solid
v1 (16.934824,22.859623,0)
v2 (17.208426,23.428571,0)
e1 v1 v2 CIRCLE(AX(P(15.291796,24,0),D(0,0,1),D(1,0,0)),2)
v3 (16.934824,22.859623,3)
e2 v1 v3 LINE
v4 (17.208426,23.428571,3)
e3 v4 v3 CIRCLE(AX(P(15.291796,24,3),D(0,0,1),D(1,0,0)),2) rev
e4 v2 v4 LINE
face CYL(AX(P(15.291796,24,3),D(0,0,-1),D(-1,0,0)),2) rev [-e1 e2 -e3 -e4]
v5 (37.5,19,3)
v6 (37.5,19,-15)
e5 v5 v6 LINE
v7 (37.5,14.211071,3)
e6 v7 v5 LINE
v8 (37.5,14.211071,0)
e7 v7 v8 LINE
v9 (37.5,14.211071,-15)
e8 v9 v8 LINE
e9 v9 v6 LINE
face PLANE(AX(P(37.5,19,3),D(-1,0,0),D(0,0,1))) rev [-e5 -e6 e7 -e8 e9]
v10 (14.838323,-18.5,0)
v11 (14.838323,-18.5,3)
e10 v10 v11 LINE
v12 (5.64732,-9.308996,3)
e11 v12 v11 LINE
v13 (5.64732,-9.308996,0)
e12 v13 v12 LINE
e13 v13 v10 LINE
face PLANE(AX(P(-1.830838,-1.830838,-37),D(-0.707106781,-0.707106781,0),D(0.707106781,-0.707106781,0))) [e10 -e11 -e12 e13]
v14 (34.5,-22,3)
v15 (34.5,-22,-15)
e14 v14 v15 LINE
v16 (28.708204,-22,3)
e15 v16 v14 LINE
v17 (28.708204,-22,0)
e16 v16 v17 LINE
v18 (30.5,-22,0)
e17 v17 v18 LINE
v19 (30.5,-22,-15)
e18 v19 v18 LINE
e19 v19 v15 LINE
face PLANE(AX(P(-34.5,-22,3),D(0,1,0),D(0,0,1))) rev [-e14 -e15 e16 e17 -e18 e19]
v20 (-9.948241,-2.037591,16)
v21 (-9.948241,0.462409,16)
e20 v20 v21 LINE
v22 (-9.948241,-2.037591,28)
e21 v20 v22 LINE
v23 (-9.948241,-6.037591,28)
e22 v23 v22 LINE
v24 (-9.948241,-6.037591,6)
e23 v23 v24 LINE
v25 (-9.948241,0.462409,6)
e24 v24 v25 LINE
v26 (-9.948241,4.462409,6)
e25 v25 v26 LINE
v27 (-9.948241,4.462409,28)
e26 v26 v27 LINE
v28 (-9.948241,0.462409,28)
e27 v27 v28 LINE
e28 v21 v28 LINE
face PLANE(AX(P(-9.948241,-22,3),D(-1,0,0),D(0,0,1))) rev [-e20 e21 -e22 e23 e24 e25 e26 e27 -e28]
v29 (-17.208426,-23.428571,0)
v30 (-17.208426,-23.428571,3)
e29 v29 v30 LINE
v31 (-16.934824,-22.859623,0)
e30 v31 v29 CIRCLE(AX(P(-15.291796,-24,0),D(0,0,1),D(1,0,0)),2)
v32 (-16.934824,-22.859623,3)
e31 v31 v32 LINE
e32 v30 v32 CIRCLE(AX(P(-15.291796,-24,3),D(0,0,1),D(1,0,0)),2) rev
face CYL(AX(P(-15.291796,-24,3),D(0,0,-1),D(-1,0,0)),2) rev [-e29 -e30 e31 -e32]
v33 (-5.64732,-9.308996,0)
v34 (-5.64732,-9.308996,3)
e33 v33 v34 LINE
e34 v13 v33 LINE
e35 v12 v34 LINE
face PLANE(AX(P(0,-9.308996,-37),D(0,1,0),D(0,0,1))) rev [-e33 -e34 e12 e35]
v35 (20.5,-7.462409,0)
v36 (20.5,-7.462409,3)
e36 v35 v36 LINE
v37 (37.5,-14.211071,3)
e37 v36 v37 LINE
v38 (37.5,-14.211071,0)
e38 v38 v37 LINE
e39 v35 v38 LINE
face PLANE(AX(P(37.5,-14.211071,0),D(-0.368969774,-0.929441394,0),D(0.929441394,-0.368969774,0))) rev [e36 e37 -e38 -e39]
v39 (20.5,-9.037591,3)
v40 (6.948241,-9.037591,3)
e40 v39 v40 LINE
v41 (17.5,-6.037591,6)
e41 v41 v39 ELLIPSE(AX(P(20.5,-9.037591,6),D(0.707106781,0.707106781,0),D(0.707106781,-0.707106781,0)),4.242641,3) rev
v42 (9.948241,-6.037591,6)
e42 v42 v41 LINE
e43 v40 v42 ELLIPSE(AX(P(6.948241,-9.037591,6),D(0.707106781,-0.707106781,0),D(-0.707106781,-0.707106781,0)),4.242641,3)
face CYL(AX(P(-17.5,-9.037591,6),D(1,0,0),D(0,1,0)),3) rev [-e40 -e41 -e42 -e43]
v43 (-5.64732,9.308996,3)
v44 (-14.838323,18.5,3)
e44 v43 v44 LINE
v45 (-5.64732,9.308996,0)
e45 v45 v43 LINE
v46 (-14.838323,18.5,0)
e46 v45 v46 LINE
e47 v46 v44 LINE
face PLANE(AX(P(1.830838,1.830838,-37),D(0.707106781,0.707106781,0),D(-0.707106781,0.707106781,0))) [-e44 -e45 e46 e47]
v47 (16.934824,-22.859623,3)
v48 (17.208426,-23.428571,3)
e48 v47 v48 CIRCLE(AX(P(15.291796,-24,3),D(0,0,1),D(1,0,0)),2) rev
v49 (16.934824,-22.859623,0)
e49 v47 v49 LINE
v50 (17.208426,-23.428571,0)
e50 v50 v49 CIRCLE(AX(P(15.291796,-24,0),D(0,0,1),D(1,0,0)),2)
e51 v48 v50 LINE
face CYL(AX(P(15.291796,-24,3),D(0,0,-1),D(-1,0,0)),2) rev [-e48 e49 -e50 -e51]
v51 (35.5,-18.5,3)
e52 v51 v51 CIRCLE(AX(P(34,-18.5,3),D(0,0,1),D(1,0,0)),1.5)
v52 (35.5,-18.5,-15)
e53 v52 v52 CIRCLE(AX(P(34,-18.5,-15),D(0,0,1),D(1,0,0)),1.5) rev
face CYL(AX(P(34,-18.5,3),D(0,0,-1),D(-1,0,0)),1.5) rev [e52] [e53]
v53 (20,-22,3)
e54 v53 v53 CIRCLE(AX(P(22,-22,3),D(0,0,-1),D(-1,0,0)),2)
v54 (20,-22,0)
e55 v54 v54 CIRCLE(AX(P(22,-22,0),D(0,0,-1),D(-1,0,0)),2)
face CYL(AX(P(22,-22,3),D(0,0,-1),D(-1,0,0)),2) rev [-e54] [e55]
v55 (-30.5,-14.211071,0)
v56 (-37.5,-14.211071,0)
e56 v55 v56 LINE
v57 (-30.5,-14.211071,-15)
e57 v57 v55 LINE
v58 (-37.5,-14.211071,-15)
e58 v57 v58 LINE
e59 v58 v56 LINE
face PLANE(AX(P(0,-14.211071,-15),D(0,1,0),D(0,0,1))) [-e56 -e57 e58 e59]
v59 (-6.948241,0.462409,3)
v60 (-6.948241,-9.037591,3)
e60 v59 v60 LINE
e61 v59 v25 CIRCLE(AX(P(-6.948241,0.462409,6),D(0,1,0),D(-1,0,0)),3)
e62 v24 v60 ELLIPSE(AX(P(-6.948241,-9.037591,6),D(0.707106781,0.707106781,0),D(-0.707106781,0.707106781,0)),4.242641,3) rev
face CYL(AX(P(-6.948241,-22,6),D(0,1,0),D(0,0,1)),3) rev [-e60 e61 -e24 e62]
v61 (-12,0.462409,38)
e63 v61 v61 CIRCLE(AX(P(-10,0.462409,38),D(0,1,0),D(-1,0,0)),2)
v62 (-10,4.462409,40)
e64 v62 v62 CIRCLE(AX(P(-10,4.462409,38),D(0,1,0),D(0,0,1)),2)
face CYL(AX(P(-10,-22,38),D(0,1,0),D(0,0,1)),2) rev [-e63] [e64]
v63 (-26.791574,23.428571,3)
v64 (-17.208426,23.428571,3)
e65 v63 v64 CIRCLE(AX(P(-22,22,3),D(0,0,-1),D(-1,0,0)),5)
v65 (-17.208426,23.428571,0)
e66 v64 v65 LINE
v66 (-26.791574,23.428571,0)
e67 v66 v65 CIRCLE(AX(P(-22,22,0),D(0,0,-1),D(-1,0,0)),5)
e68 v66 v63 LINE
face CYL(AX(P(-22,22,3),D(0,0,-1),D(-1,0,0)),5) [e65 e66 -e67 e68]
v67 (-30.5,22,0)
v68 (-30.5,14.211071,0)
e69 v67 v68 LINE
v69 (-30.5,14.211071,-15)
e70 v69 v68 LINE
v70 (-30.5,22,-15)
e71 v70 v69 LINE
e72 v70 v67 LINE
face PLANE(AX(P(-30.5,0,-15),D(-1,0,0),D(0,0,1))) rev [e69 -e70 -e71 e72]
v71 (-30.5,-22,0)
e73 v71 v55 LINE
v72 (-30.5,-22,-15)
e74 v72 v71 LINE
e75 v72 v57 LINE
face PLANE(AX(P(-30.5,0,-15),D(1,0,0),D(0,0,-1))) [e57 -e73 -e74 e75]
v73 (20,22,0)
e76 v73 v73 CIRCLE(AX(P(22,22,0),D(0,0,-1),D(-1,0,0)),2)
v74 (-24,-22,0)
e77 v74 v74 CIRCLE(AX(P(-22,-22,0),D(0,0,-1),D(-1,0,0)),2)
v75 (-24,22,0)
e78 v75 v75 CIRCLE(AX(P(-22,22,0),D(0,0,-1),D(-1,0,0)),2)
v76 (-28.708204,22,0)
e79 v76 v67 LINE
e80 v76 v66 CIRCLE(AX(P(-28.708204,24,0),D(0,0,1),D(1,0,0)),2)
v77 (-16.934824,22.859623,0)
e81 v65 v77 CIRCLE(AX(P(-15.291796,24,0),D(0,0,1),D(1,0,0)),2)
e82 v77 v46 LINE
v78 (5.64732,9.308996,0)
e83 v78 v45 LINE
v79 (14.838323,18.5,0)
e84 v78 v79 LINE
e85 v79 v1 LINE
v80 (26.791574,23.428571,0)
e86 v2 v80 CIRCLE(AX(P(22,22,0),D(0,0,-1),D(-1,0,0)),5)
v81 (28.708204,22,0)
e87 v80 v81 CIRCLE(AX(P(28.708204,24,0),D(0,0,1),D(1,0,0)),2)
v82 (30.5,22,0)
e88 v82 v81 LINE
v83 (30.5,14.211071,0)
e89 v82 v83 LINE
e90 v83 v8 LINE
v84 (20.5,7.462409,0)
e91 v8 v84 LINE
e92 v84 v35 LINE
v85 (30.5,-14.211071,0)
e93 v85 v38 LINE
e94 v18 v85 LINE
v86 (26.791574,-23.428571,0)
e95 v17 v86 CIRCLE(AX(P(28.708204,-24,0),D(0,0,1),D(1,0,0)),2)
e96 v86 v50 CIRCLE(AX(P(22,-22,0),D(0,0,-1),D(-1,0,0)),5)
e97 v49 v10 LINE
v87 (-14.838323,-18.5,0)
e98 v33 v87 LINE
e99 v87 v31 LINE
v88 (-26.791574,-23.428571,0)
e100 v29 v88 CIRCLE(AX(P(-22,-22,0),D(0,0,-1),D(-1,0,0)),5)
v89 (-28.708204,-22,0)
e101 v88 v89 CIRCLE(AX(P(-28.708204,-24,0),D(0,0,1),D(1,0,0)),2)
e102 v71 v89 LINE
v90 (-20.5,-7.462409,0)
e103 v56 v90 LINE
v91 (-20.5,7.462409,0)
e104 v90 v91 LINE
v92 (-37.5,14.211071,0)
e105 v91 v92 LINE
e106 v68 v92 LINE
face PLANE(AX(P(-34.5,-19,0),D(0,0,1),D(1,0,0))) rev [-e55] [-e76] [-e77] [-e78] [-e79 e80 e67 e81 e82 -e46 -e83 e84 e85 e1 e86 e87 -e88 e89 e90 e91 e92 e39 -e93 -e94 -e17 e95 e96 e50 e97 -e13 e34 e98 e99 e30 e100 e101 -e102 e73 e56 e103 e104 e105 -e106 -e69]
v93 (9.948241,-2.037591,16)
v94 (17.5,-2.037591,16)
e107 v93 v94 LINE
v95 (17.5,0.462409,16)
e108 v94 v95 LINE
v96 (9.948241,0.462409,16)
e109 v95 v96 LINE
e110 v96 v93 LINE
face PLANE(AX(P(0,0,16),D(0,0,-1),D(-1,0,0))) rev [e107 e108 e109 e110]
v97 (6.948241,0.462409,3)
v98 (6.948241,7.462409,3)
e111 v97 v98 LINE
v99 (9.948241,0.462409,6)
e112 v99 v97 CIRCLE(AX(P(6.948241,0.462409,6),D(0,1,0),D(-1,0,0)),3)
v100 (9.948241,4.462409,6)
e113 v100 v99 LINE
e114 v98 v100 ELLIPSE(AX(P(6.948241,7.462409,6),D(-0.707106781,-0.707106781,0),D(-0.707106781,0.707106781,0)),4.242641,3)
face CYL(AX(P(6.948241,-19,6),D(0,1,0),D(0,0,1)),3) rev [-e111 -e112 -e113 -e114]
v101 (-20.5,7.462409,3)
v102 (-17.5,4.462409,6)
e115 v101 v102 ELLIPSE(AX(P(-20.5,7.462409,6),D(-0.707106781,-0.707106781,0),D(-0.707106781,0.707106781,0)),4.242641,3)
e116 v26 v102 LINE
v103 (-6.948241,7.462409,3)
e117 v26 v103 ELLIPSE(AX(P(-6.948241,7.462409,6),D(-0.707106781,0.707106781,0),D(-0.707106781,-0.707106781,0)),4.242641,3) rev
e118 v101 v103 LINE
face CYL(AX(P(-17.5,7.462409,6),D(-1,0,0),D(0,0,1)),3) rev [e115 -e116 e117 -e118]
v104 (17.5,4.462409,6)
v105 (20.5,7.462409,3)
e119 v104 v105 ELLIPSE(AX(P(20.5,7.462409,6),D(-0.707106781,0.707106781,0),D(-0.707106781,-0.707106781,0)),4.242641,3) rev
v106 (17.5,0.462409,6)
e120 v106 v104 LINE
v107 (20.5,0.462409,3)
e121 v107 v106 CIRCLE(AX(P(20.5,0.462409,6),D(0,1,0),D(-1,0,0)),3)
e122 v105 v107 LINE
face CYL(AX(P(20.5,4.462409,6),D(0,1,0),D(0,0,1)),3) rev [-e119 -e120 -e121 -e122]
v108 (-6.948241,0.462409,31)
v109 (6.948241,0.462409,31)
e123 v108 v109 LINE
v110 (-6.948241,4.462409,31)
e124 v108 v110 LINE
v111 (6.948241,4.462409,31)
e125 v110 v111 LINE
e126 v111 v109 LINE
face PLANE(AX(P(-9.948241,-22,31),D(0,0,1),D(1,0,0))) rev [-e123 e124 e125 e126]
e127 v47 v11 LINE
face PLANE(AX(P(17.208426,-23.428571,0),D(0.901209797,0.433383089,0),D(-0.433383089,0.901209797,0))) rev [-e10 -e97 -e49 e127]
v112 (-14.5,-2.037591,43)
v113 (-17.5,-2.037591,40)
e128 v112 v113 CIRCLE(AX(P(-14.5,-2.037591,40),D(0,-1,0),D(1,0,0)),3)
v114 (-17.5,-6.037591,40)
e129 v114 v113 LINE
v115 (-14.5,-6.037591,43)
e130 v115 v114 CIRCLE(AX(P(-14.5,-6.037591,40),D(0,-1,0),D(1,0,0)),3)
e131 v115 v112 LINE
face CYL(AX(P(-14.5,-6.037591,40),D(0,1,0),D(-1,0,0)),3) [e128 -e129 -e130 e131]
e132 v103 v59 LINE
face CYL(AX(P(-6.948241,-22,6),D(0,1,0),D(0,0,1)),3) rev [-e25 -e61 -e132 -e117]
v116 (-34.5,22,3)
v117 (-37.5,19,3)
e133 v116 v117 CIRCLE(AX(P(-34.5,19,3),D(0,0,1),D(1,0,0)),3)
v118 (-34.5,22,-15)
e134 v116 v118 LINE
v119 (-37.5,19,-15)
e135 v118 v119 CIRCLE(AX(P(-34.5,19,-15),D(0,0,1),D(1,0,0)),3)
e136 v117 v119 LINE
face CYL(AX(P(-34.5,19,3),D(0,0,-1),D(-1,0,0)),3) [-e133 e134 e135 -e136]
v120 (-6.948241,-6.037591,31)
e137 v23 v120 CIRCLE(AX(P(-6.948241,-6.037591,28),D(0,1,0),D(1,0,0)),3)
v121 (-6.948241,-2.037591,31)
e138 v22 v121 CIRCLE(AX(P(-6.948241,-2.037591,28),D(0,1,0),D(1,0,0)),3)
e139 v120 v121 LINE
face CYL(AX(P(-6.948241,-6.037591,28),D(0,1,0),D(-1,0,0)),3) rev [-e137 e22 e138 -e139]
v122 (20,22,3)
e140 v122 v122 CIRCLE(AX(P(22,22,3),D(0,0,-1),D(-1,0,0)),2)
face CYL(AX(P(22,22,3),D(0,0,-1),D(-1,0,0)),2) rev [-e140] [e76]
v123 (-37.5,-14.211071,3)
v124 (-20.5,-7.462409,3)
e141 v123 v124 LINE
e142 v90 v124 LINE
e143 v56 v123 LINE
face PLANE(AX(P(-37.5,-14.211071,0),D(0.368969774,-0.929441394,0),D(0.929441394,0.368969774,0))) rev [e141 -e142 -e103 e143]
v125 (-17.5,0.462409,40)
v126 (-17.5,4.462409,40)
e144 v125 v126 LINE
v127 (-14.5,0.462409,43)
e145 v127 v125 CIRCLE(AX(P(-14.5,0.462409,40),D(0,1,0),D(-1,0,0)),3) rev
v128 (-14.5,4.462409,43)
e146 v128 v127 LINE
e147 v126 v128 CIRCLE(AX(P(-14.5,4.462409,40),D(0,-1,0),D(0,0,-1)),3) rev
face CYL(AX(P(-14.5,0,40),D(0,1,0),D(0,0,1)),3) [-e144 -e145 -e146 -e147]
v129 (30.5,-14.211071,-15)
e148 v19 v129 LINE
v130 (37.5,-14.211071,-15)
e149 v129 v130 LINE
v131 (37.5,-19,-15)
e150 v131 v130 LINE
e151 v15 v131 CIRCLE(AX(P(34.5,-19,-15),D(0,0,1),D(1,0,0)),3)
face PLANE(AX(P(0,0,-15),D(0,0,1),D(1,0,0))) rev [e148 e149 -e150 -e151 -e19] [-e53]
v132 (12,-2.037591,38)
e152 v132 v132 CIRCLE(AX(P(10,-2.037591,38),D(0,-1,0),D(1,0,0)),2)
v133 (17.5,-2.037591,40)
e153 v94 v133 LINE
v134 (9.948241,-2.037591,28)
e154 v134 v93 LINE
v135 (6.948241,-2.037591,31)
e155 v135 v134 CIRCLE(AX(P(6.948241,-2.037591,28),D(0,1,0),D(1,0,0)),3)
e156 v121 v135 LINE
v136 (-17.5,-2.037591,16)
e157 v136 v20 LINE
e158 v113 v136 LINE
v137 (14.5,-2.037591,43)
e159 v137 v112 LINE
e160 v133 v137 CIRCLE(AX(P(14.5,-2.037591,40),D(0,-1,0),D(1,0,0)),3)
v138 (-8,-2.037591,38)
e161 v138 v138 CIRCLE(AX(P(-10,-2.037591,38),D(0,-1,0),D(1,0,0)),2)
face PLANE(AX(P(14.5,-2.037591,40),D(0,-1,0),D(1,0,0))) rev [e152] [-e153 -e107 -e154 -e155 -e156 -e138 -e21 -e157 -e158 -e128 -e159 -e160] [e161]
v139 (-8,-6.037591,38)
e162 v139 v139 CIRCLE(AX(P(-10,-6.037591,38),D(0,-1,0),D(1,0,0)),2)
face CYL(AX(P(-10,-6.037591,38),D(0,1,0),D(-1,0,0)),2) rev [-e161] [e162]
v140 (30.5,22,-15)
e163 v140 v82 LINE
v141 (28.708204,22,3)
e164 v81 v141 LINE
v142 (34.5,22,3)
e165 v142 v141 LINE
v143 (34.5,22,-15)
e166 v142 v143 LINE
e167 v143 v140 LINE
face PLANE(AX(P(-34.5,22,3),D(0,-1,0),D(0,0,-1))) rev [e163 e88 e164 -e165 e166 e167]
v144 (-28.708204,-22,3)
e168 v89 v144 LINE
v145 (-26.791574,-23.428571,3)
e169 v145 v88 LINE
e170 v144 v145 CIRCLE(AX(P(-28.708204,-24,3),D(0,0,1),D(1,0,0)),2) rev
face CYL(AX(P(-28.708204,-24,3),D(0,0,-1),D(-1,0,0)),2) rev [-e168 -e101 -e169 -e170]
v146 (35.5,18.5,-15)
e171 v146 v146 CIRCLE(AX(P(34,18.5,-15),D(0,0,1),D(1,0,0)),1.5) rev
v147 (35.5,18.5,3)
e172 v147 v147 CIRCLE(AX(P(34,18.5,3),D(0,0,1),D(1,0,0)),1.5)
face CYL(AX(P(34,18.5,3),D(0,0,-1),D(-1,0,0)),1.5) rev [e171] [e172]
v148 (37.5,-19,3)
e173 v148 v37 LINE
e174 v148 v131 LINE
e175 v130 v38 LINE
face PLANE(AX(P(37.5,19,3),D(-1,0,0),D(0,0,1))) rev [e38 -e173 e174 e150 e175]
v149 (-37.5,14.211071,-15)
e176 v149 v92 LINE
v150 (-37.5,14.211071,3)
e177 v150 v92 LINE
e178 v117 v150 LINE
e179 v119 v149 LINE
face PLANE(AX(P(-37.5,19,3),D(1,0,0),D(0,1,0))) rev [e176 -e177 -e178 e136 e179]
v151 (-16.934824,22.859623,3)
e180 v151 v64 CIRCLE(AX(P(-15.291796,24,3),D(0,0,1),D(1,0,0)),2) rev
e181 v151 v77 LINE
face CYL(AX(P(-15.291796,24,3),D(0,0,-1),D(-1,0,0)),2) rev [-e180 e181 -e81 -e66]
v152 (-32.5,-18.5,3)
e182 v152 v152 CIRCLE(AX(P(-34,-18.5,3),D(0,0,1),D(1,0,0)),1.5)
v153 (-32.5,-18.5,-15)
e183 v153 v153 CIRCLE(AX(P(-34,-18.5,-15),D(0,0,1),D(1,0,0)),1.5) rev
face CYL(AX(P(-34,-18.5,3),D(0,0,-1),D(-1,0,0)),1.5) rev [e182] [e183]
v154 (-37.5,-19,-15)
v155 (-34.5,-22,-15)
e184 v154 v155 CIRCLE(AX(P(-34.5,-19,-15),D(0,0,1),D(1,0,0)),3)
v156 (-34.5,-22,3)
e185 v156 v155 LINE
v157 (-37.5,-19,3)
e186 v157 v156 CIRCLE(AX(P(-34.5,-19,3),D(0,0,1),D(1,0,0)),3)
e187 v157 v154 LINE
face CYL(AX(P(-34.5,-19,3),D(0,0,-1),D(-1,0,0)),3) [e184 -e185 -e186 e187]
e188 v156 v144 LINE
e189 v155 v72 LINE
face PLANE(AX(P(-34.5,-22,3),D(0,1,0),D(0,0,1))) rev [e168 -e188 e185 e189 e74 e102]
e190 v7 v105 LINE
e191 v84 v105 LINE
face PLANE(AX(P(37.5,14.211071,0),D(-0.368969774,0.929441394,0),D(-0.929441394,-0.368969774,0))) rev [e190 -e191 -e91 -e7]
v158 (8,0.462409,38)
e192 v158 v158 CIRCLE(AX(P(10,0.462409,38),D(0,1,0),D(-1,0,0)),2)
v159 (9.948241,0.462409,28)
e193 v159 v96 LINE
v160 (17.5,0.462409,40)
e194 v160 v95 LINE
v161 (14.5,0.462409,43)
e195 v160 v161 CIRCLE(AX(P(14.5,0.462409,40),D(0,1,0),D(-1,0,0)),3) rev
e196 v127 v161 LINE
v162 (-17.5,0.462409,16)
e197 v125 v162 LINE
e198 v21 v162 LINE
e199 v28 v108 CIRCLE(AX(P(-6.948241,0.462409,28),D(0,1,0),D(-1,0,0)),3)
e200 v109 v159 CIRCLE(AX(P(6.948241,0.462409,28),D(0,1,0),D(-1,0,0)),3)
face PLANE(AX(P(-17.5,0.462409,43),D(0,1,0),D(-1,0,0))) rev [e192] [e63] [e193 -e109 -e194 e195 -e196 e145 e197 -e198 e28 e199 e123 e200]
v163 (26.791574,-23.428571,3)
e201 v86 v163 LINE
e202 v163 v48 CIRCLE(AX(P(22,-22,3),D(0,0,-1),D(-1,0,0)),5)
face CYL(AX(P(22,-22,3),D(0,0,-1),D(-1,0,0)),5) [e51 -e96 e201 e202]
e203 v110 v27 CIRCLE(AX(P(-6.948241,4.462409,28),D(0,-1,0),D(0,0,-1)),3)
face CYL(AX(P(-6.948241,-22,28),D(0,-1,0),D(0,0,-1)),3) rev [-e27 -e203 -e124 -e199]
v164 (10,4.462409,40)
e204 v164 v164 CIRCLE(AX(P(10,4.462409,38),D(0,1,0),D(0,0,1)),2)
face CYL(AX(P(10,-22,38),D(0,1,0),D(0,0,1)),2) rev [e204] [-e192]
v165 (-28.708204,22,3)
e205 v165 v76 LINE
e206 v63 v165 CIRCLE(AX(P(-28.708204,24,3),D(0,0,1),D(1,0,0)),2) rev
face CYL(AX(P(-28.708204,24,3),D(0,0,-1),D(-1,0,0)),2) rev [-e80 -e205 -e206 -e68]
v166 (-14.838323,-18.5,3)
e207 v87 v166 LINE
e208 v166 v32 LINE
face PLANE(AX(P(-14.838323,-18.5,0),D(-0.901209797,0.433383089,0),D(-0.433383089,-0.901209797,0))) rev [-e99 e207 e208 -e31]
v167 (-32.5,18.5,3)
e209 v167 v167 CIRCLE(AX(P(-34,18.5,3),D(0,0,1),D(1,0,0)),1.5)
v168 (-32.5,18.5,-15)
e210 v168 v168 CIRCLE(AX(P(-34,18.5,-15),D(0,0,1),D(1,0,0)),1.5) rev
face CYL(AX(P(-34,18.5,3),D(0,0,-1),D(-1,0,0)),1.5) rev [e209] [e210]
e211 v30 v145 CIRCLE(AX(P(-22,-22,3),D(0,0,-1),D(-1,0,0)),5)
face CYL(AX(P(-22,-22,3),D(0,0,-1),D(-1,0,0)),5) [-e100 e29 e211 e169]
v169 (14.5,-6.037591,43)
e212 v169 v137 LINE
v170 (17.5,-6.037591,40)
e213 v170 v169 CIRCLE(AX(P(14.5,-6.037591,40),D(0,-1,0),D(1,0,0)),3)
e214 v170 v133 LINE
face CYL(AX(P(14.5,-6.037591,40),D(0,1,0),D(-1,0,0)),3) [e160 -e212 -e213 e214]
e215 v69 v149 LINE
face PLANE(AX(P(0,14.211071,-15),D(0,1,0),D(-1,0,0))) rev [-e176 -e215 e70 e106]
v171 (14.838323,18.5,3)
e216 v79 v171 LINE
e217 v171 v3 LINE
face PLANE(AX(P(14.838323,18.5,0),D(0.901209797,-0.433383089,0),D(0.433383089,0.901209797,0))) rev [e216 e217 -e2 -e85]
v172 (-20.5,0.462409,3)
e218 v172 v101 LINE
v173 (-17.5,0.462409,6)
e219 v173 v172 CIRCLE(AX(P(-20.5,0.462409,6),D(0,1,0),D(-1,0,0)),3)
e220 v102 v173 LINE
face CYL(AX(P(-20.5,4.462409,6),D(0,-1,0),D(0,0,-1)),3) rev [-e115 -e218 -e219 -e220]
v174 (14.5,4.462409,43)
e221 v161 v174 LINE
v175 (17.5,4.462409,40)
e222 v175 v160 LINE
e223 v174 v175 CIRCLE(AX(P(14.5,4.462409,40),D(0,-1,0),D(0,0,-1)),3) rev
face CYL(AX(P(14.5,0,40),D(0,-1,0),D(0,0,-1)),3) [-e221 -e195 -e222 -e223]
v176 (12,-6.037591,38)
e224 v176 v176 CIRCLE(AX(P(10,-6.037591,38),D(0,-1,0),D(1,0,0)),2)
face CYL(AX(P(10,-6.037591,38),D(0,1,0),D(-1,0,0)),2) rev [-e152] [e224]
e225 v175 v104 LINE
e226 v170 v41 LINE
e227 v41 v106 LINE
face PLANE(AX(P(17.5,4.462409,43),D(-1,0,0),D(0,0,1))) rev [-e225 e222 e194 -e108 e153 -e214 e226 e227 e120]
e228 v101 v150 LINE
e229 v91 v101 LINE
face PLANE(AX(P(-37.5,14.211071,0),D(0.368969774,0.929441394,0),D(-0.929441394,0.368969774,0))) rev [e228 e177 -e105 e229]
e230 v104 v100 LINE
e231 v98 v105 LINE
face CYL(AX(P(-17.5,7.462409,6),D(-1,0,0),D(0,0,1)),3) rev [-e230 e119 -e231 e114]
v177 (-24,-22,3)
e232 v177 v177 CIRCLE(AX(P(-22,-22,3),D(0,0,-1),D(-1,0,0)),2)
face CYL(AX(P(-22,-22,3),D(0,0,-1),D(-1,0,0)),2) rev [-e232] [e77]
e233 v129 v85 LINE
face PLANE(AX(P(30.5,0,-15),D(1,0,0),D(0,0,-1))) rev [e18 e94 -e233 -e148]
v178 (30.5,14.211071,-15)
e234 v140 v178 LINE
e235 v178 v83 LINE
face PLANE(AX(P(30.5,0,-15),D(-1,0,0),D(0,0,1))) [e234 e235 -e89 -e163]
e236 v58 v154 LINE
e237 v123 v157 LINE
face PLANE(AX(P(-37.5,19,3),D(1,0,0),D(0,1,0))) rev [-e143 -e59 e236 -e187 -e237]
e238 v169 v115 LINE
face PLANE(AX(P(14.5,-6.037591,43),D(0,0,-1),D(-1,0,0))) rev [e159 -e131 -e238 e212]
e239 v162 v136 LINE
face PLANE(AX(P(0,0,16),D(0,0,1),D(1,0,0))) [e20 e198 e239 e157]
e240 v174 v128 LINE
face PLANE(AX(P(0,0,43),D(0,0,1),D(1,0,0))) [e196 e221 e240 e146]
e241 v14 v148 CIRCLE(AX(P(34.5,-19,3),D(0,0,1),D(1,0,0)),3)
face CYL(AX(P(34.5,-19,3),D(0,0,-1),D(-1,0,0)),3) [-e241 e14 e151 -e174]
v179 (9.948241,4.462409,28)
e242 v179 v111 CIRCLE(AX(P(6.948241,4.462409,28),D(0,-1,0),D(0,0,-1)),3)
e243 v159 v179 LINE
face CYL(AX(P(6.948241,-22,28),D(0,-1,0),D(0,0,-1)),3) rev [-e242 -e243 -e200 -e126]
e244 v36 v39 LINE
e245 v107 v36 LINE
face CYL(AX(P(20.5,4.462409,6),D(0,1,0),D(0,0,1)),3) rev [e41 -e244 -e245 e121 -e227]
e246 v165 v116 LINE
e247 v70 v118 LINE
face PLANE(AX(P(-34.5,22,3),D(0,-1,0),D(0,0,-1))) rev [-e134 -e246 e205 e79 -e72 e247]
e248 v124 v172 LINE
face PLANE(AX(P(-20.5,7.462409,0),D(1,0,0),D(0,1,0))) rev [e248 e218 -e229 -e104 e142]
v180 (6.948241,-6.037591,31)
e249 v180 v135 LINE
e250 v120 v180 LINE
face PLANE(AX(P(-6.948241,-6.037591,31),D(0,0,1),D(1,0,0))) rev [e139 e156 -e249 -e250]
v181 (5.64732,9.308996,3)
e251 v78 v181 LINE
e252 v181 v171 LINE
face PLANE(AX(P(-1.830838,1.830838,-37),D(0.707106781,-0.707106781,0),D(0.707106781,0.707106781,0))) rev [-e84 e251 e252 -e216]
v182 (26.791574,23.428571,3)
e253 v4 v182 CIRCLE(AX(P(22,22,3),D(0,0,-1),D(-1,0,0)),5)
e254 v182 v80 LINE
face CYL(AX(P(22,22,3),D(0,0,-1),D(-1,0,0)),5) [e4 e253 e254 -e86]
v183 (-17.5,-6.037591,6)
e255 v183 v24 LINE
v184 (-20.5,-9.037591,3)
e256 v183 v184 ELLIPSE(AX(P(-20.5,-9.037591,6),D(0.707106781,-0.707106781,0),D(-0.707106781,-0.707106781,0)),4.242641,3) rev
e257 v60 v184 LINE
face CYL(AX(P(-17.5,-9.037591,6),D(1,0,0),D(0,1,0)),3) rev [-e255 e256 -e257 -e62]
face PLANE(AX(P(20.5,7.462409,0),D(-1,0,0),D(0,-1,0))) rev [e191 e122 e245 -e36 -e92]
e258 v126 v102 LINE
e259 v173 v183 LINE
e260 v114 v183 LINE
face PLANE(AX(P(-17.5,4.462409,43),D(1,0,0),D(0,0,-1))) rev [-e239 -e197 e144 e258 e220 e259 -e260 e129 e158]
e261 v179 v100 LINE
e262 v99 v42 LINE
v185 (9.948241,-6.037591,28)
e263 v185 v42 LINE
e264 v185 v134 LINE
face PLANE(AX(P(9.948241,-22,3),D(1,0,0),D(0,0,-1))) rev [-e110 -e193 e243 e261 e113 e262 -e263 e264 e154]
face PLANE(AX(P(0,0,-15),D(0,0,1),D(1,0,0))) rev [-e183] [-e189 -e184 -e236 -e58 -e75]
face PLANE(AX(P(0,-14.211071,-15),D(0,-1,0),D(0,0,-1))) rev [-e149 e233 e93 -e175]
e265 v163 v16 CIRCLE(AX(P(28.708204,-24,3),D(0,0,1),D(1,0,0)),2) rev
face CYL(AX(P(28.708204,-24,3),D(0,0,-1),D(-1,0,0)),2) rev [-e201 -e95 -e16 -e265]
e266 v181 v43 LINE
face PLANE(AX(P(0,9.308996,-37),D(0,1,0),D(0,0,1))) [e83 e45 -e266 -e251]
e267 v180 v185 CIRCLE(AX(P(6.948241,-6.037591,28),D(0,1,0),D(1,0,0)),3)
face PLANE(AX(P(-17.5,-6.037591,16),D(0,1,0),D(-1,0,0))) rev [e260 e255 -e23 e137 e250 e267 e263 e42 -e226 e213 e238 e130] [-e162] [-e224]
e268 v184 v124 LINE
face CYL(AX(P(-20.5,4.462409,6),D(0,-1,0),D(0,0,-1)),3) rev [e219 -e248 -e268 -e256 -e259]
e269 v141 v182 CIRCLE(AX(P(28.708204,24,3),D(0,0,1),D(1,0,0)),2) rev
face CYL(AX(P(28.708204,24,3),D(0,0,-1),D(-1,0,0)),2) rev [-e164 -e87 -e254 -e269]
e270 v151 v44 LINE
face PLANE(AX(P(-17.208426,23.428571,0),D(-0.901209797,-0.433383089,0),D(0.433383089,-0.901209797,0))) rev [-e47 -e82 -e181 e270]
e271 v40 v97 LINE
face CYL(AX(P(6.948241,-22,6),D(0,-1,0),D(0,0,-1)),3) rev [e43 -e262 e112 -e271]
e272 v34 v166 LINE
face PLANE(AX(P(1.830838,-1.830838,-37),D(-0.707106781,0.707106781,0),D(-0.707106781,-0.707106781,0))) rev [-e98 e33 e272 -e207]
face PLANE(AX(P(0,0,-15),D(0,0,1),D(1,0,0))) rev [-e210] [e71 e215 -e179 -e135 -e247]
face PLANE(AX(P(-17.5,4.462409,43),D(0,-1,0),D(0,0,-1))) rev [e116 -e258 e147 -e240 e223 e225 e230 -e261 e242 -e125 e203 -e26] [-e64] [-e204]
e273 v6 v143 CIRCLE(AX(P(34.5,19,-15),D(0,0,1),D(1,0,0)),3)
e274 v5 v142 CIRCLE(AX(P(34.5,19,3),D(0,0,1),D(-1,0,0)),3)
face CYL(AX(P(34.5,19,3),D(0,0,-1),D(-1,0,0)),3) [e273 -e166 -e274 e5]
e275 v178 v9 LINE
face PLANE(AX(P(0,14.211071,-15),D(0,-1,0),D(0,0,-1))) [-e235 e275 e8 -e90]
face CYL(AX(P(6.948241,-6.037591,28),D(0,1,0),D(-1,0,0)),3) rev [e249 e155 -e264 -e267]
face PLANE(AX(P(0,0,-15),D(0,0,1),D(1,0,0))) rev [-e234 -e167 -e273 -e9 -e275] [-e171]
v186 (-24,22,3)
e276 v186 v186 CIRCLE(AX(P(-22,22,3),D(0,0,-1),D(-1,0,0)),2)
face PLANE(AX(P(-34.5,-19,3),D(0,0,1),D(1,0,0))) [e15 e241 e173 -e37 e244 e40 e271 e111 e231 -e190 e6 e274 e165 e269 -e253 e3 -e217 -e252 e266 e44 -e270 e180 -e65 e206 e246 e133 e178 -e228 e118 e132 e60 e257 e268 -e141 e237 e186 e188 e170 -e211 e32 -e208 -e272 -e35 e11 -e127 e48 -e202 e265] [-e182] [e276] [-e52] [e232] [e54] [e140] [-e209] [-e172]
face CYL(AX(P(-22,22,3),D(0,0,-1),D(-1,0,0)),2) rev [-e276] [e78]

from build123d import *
from build123d.topology import SkipClean

# Parameters (mm, degrees)
SKETCH_1_R           = 1.5
EXTRUDE_1_DEPTH      = 3
SKETCH_3_W           = 35
SKETCH_3_H           = 4
EXTRUDE_2_DEPTH      = 40
CUT_EXTRUDE_3_DEPTH  = 40
SKETCH_5_R           = 2
EXTRUDE_3_DEPTH      = 4
SKETCH_4_R           = 2
CUT_EXTRUDE_4_DEPTH  = 74.181343691
EXTRUDE_START        = 4
SKETCH_6_R           = 2
SKETCH_6_W           = 11.5
SKETCH_6_H           = 11
EXTRUDE_4_DEPTH      = 4
SKETCH_7_R           = 2
SKETCH_7_W           = 19.896481546
SKETCH_7_H           = 28
CUT_EXTRUDE_5_DEPTH  = 74.181343691
CUT_EXTRUDE_6_DEPTH  = 73.339863176
FILLET_2_R           = 3
FILLET_3_R           = 3
EXTRUDE_START_2      = -18
SKETCH_10_R          = 1.5
EXTRUDE_5_DEPTH      = 18
FILLET_4_R           = 3
FILLET_5_R           = 3
FILLET_6_R           = 3
FILLET_7_R           = 3
SKETCH_12_R          = 5
SKETCH_12_R_2        = 2
EXTRUDE_6_DEPTH      = 3
SKETCH_13_R          = 2
CUT_EXTRUDE_7_DEPTH  = 3
SKETCH_14_W          = 30
SKETCH_14_H          = 40
SKETCH_14_W_2        = 75.097471979
SKETCH_14_H_2        = 56.842097172
CUT_EXTRUDE_8_DEPTH  = 75.15141077
FILLET_11_R          = 2
FILLET_12_R          = 2
CUT_EXTRUDE_9_DEPTH  = 3
CUT_EXTRUDE_10_DEPTH = 3
SKETCH_19_W          = 7.551759227
SKETCH_19_H          = 6.5
EXTRUDE_8_DEPTH      = 13
FILLET_14_R          = 3
EXTRUDE_START_3      = 2.5
SKETCH_20_R          = 2
EXTRUDE_9_DEPTH      = 4
FILLET_15_R          = 3


with BuildPart() as part:
    # 草图1 → 凸台-拉伸1 (new body)
    with BuildSketch(Plane.XY):
        with BuildLine():
            Line((-34.5, 22), (34.5, 22))
            ThreePointArc((34.5, 22), (36.621320344, 21.121320344), (37.5, 19))
            Line((37.5, 19), (37.5, -19))
            ThreePointArc((37.5, -19), (36.621320344, -21.121320344), (34.5, -22))
            Line((34.5, -22), (-34.5, -22))
            ThreePointArc((-34.5, -22), (-36.621320344, -21.121320344), (-37.5, -19))
            Line((-37.5, -19), (-37.5, 19))
            ThreePointArc((-37.5, 19), (-36.621320344, 21.121320344), (-34.5, 22))
        make_face()
        with Locations((-34, 18.5)):
            Circle(SKETCH_1_R, mode=Mode.SUBTRACT)
        with Locations((-34, -18.5)):
            Circle(SKETCH_1_R, mode=Mode.SUBTRACT)
        with Locations((34, -18.5)):
            Circle(SKETCH_1_R, mode=Mode.SUBTRACT)
        with Locations((34, 18.5)):
            Circle(SKETCH_1_R, mode=Mode.SUBTRACT)
    extrude(amount=EXTRUDE_1_DEPTH)

    # 草图3 → 凸台-拉伸2 (add)
    with BuildSketch(Plane.XY.offset(3)):
        with Locations((0, 2.462408516)):
            Rectangle(SKETCH_3_W, SKETCH_3_H)
        with Locations((0, -4.037591484)):
            Rectangle(SKETCH_3_W, SKETCH_3_H)
    extrude(amount=EXTRUDE_2_DEPTH)

    # 草图2 → 切除-拉伸3 (cut)
    with BuildSketch(Plane.XY.offset(3)):
        Polygon((14.838323353, 18.5), (-14.838323353, 18.5), (-5.64731974, 9.308996386), (5.64731974, 9.308996386), align=None)
        Polygon((-28, 4.711070882), (-37.5, 14.211070882), (-37.5, -14.211070882), (-28, -4.711070882), align=None)
        Polygon((37.5, -14.211070882), (37.5, 14.211070882), (28, 4.711070882), (28, -4.711070882), align=None)
        Polygon((-5.64731974, -9.308996386), (-14.838323353, -18.5), (14.838323353, -18.5), (5.64731974, -9.308996386), align=None)
    extrude(amount=-CUT_EXTRUDE_3_DEPTH, mode=Mode.SUBTRACT)

    # 草图5 → 凸台-拉伸3 (add)
    with BuildSketch(Plane.XZ.offset(6.037591484)):
        with BuildLine():
            Line((-24.5, 57), (24.5, 57))
            ThreePointArc((24.5, 57), (26.621320344, 56.121320344), (27.5, 54))
            Line((27.5, 54), (27.5, 3))
            Line((27.5, 3), (-27.5, 3))
            Line((-27.5, 3), (-27.5, 54))
            ThreePointArc((-27.5, 54), (-26.621320344, 56.121320344), (-24.5, 57))
        make_face()
        with Locations(Location((-22, 52, 0), (0, 0, 270))):
            Circle(SKETCH_5_R, mode=Mode.SUBTRACT)
        with Locations(Location((-22, 8, 0), (0, 0, 270))):
            Circle(SKETCH_5_R, mode=Mode.SUBTRACT)
        with Locations(Location((22, 8, 0), (0, 0, 270))):
            Circle(SKETCH_5_R, mode=Mode.SUBTRACT)
        with Locations(Location((22, 52, 0), (0, 0, 270))):
            Circle(SKETCH_5_R, mode=Mode.SUBTRACT)
    extrude(amount=-EXTRUDE_3_DEPTH)

    # 草图4 → 切除-拉伸4 (cut, through all)
    with BuildSketch(Plane(origin=(0, 4.462408516, 0), x_dir=(1, 0, 0), z_dir=(0, 1, 0))):
        with Locations(Location((-10, -38, 0), (0, 0, 180))):
            Circle(SKETCH_4_R)
        with Locations(Location((10, -38, 0), (0, 0, 180))):
            Circle(SKETCH_4_R)
    extrude(amount=-CUT_EXTRUDE_4_DEPTH, mode=Mode.SUBTRACT)

    # 草图6 → 凸台-拉伸4 (add)
    # profile 1 of 4: a face of its own
    with BuildSketch(Plane.XZ.offset(6.037591484).offset(EXTRUDE_START)):
        with BuildLine():
            Line((-27.5, 46), (-16, 46))
            Line((-16, 46), (-16, 57))
            Line((-16, 57), (-24.5, 57))
            ThreePointArc((-24.5, 57), (-26.621320344, 56.121320344), (-27.5, 54))
            Line((-27.5, 54), (-27.5, 46))
        make_face()
        with Locations((-22, 52)):
            Circle(SKETCH_6_R, mode=Mode.SUBTRACT)
    # profile 2 of 4: a face of its own
    with BuildSketch(Plane.XZ.offset(6.037591484).offset(EXTRUDE_START)):
        with Locations((-21.75, 8.5)):
            Rectangle(SKETCH_6_W, SKETCH_6_H)
        with Locations((-22, 8)):
            Circle(SKETCH_6_R, mode=Mode.SUBTRACT)
    # profile 3 of 4: a face of its own
    with BuildSketch(Plane.XZ.offset(6.037591484).offset(EXTRUDE_START)):
        with BuildLine():
            Line((24.5, 57), (16, 57))
            Line((16, 57), (16, 46))
            Line((16, 46), (27.5, 46))
            Line((27.5, 46), (27.5, 54))
            ThreePointArc((27.5, 54), (26.621320344, 56.121320344), (24.5, 57))
        make_face()
        with Locations((22, 52)):
            Circle(SKETCH_6_R, mode=Mode.SUBTRACT)
    # profile 4 of 4: a face of its own
    with BuildSketch(Plane.XZ.offset(6.037591484).offset(EXTRUDE_START)):
        with Locations((21.75, 8.5)):
            Rectangle(SKETCH_6_W, SKETCH_6_H)
        with Locations((22, 8)):
            Circle(SKETCH_6_R, mode=Mode.SUBTRACT)
    extrude(amount=-EXTRUDE_4_DEPTH)

    # 草图7 → 切除-拉伸5 (cut, through all)
    with BuildSketch(Plane(origin=(0, 4.462408516, 0), x_dir=(1, 0, 0), z_dir=(0, 1, 0))):
        with Locations(Location((-10, -38, 0), (0, 0, 180))):
            Circle(SKETCH_7_R)
        with Locations((0, -17)):
            Rectangle(SKETCH_7_W, SKETCH_7_H)
    extrude(amount=-CUT_EXTRUDE_5_DEPTH, mode=Mode.SUBTRACT)

    # 草图8 → 切除-拉伸6 (cut, through all)
    with BuildSketch(Plane(origin=(0, -2.037591484, 0), x_dir=(1, 0, 0), z_dir=(0, 1, 0))):
        Polygon((-27.5, -10.721015485), (-17.5, -18.39194813), (-17.5, -40.845407225), (-27.5, -48.99577316), align=None)
        Polygon((27.5, -10.721015485), (17.5, -18.39194813), (17.5, -40.845407225), (27.5, -48.99577316), align=None)
    extrude(amount=-CUT_EXTRUDE_6_DEPTH, mode=Mode.SUBTRACT)

    # 圆角2
    fillet_2_edges = [part.edges().sort_by_distance(p)[0] for p in [
        (-12.974120387, -6.037591484, 3),
        (12.974120387, -6.037591484, 3),
        (-13.724120387, 4.462408516, 3),
        (13.724120387, 4.462408516, 3),
    ]]
    fillet(fillet_2_edges, radius=FILLET_2_R)

    # 圆角3
    fillet_3_edges = [part.edges().sort_by_distance(p)[0] for p in [
        (-17.5, 3.962408516, 3),
        (17.5, 3.962408516, 3),
        (9.948240773, -5.537591484, 3),
        (9.948240773, 3.962408516, 3),
        (-9.948240773, -5.537591484, 3),
        (-9.948240773, 3.962408516, 3),
    ]]
    fillet(fillet_3_edges, radius=FILLET_3_R)

    # 草图10 → 凸台-拉伸5 (add)
    # profile 1 of 4: a face of its own
    with SkipClean():  # the faces are left unmerged after this step: merging them gives an invalid solid
        with BuildSketch(Plane.XY.offset(3).offset(EXTRUDE_START_2)):
            with BuildLine():
                Line((-30.5, 14.211070882), (-30.5, 22))
                Line((-30.5, 22), (-34.5, 22))
                ThreePointArc((-34.5, 22), (-36.621320344, 21.121320344), (-37.5, 19))
                Line((-37.5, 19), (-37.5, 14.211070882))
                Line((-37.5, 14.211070882), (-30.5, 14.211070882))
            make_face()
            with Locations((-34, 18.5)):
                Circle(SKETCH_10_R, mode=Mode.SUBTRACT)
        # profile 2 of 4: a face of its own
        with BuildSketch(Plane.XY.offset(3).offset(EXTRUDE_START_2)):
            with BuildLine():
                Line((-30.5, -14.211070882), (-37.5, -14.211070882))
                Line((-37.5, -14.211070882), (-37.5, -19))
                ThreePointArc((-37.5, -19), (-36.621320344, -21.121320344), (-34.5, -22))
                Line((-34.5, -22), (-30.5, -22))
                Line((-30.5, -22), (-30.5, -14.211070882))
            make_face()
            with Locations((-34, -18.5)):
                Circle(SKETCH_10_R, mode=Mode.SUBTRACT)
        # profile 3 of 4: a face of its own
        with BuildSketch(Plane.XY.offset(3).offset(EXTRUDE_START_2)):
            with BuildLine():
                Line((37.5, -19), (37.5, -14.211070882))
                Line((37.5, -14.211070882), (30.5, -14.211070882))
                Line((30.5, -14.211070882), (30.5, -22))
                Line((30.5, -22), (34.5, -22))
                ThreePointArc((34.5, -22), (36.621320344, -21.121320344), (37.5, -19))
            make_face()
            with Locations((34, -18.5)):
                Circle(SKETCH_10_R, mode=Mode.SUBTRACT)
        # profile 4 of 4: a face of its own
        with BuildSketch(Plane.XY.offset(3).offset(EXTRUDE_START_2)):
            with BuildLine():
                Line((34.5, 22), (30.5, 22))
                Line((30.5, 22), (30.5, 14.211070882))
                Line((30.5, 14.211070882), (37.5, 14.211070882))
                Line((37.5, 14.211070882), (37.5, 19))
                ThreePointArc((37.5, 19), (36.621320344, 21.121320344), (34.5, 22))
            make_face()
            with Locations((34, 18.5)):
                Circle(SKETCH_10_R, mode=Mode.SUBTRACT)
        extrude(amount=EXTRUDE_5_DEPTH)
    add(part.part.scale(1), mode=Mode.REPLACE)  # the faces are merged on a copy

    # 圆角4
    fillet_4_edges = [part.edges().sort_by_distance(p)[0] for p in [
        (-17.5, -4.037591484, 18.39194813),
        (-17.5, -4.037591484, 40.845407225),
        (17.5, -4.037591484, 40.845407225),
        (17.5, -4.037591484, 18.39194813),
    ]]
    fillet(fillet_4_edges, radius=FILLET_4_R)

    # 圆角5
    fillet_5_edges = [part.edges().sort_by_distance(p)[0] for p in [
        (-27.5, -6.037591484, 10.721015485),
        (-27.5, -6.037591484, 48.99577316),
        (27.5, -6.037591484, 48.99577316),
        (27.5, -6.037591484, 10.721015485),
    ]]
    fillet(fillet_5_edges, radius=FILLET_5_R)

    # 圆角6
    fillet_6_edges = [part.edges().sort_by_distance(p)[0] for p in [
        (9.948240773, 2.462408516, 31),
        (-9.948240773, 2.462408516, 31),
    ]]
    fillet(fillet_6_edges, radius=FILLET_6_R)

    # 圆角7
    fillet_7_edges = [part.edges().sort_by_distance(p)[0] for p in [
        (17.5, 2.462408516, 43),
        (-17.5, 2.462408516, 43),
    ]]
    fillet(fillet_7_edges, radius=FILLET_7_R)

    # 草图12 → 凸台-拉伸6 (add)
    # profile 1 of 4: a face of its own
    with BuildSketch(Plane(origin=(0, 0, 0), x_dir=(-1, 0, 0), z_dir=(0, 0, -1))):
        with Locations((-22, 22)):
            Circle(SKETCH_12_R)
        with Locations((-22, 22)):
            Circle(SKETCH_12_R_2, mode=Mode.SUBTRACT)
    # profile 2 of 4: a face of its own
    with BuildSketch(Plane(origin=(0, 0, 0), x_dir=(-1, 0, 0), z_dir=(0, 0, -1))):
        with Locations((22, 22)):
            Circle(SKETCH_12_R)
        with Locations((22, 22)):
            Circle(SKETCH_12_R_2, mode=Mode.SUBTRACT)
    # profile 3 of 4: a face of its own
    with BuildSketch(Plane(origin=(0, 0, 0), x_dir=(-1, 0, 0), z_dir=(0, 0, -1))):
        with Locations((22, -22)):
            Circle(SKETCH_12_R)
        with Locations((22, -22)):
            Circle(SKETCH_12_R_2, mode=Mode.SUBTRACT)
    # profile 4 of 4: a face of its own
    with BuildSketch(Plane(origin=(0, 0, 0), x_dir=(-1, 0, 0), z_dir=(0, 0, -1))):
        with Locations((-22, -22)):
            Circle(SKETCH_12_R)
        with Locations((-22, -22)):
            Circle(SKETCH_12_R_2, mode=Mode.SUBTRACT)
    extrude(amount=-EXTRUDE_6_DEPTH)

    # 草图13 → 切除-拉伸7 (cut)
    with BuildSketch(Plane(origin=(0, 0, 0), x_dir=(-1, 0, 0), z_dir=(0, 0, -1))):
        with Locations((-22, 22)):
            Circle(SKETCH_13_R)
        with Locations((22, 22)):
            Circle(SKETCH_13_R)
        with Locations((22, -22)):
            Circle(SKETCH_13_R)
        with Locations((-22, -22)):
            Circle(SKETCH_13_R)
    extrude(amount=-CUT_EXTRUDE_7_DEPTH, mode=Mode.SUBTRACT)

    # 草图14 → 切除-拉伸8 (cut, through all)
    with BuildSketch(Plane(origin=(0, -2.037591484, 0), x_dir=(1, 0, 0), z_dir=(0, 1, 0))):
        with Locations((-2.5, -23)):
            Rectangle(SKETCH_14_W, SKETCH_14_H)
        with Locations((0.04873599, -31.421048586)):
            Rectangle(SKETCH_14_W_2, SKETCH_14_H_2)
    extrude(amount=-CUT_EXTRUDE_8_DEPTH, mode=Mode.SUBTRACT)

    # 圆角11
    fillet_11_edges = [part.edges().sort_by_distance(p)[0] for p in [
        (27, 22, 1.5),
        (17, 22, 1.5),
        (-27, 22, 1.5),
        (-17, 22, 1.5),
    ]]
    fillet(fillet_11_edges, radius=FILLET_11_R)

    # 圆角12
    fillet_12_edges = [part.edges().sort_by_distance(p)[0] for p in [
        (-27, -22, 1.5),
        (-17, -22, 1.5),
        (27, -22, 1.5),
        (17, -22, 1.5),
    ]]
    fillet(fillet_12_edges, radius=FILLET_12_R)

    # 草图15 → 切除-拉伸9 (cut)
    with BuildSketch(Plane.XY.offset(3)):
        Polygon((-37.5, 14.211070882), (-20.5, 7.462408516), (-20.5, -7.462408516), (-37.5, -14.211070882), align=None)
        Polygon((37.5, 14.211070882), (20.5, 7.462408516), (20.5, -7.462408516), (37.5, -14.211070882), align=None)
    extrude(amount=-CUT_EXTRUDE_9_DEPTH, mode=Mode.SUBTRACT)

    # 草图17 → 切除-拉伸10 (cut)
    with BuildSketch(Plane.XY.offset(3)):
        Polygon((-17.208425762, 23.428571429), (-14.838323353, 18.5), (14.838323353, 18.5), (17.208425763, 23.428571429), align=None)
        Polygon((-14.838323353, -18.5), (-17.208425763, -23.428571429), (17.208425762, -23.428571429), (14.838323353, -18.5), align=None)
    extrude(amount=-CUT_EXTRUDE_10_DEPTH, mode=Mode.SUBTRACT)

    # 草图19 → 凸台-拉伸8 (add)
    with BuildSketch(Plane.XY.offset(3)):
        with Locations((-13.724120387, -2.787591484)):
            Rectangle(SKETCH_19_W, SKETCH_19_H)
        with Locations((13.724120387, -2.787591484)):
            Rectangle(SKETCH_19_W, SKETCH_19_H)
    extrude(amount=EXTRUDE_8_DEPTH)

    # 圆角14
    fillet_14_edges = [part.edges().sort_by_distance(p)[0] for p in [
        (-9.948240773, -2.787591484, 3),
        (9.948240773, -2.787591484, 3),
    ]]
    fillet(fillet_14_edges, radius=FILLET_14_R)

    # 草图20 → 凸台-拉伸9 (add)
    with BuildSketch(Plane.XZ.offset(-0.462408516).offset(EXTRUDE_START_3)):
        with BuildLine():
            Line((9.948240773, 16), (17.5, 16))
            Line((17.5, 16), (17.5, 40))
            ThreePointArc((17.5, 40), (16.621320344, 42.121320344), (14.5, 43))
            Line((14.5, 43), (-14.5, 43))
            ThreePointArc((-14.5, 43), (-16.621320344, 42.121320344), (-17.5, 40))
            Line((-17.5, 40), (-17.5, 16))
            Line((-17.5, 16), (-9.948240773, 16))
            Line((-9.948240773, 16), (-9.948240773, 28))
            ThreePointArc((-9.948240773, 28), (-9.069561117, 30.121320344), (-6.948240773, 31))
            Line((-6.948240773, 31), (6.948240773, 31))
            ThreePointArc((6.948240773, 31), (9.069561117, 30.121320344), (9.948240773, 28))
            Line((9.948240773, 28), (9.948240773, 16))
        make_face()
        with Locations(Location((-10, 38, 0), (0, 0, 90))):
            Circle(SKETCH_20_R, mode=Mode.SUBTRACT)
        with Locations(Location((10, 38, 0), (0, 0, 90))):
            Circle(SKETCH_20_R, mode=Mode.SUBTRACT)
    extrude(amount=EXTRUDE_9_DEPTH)

    # 圆角15
    fillet_15_edges = [part.edges().sort_by_distance(p)[0] for p in [
        (17.5, -2.787591484, 3),
        (12.224120387, -6.037591484, 3),
        (-12.224120387, -6.037591484, 3),
        (-17.5, -2.787591484, 3),
    ]]
    fillet(fillet_15_edges, radius=FILLET_15_R - 0.0001)  # a hair under: the kernel refuses the full size


solid = part.part
